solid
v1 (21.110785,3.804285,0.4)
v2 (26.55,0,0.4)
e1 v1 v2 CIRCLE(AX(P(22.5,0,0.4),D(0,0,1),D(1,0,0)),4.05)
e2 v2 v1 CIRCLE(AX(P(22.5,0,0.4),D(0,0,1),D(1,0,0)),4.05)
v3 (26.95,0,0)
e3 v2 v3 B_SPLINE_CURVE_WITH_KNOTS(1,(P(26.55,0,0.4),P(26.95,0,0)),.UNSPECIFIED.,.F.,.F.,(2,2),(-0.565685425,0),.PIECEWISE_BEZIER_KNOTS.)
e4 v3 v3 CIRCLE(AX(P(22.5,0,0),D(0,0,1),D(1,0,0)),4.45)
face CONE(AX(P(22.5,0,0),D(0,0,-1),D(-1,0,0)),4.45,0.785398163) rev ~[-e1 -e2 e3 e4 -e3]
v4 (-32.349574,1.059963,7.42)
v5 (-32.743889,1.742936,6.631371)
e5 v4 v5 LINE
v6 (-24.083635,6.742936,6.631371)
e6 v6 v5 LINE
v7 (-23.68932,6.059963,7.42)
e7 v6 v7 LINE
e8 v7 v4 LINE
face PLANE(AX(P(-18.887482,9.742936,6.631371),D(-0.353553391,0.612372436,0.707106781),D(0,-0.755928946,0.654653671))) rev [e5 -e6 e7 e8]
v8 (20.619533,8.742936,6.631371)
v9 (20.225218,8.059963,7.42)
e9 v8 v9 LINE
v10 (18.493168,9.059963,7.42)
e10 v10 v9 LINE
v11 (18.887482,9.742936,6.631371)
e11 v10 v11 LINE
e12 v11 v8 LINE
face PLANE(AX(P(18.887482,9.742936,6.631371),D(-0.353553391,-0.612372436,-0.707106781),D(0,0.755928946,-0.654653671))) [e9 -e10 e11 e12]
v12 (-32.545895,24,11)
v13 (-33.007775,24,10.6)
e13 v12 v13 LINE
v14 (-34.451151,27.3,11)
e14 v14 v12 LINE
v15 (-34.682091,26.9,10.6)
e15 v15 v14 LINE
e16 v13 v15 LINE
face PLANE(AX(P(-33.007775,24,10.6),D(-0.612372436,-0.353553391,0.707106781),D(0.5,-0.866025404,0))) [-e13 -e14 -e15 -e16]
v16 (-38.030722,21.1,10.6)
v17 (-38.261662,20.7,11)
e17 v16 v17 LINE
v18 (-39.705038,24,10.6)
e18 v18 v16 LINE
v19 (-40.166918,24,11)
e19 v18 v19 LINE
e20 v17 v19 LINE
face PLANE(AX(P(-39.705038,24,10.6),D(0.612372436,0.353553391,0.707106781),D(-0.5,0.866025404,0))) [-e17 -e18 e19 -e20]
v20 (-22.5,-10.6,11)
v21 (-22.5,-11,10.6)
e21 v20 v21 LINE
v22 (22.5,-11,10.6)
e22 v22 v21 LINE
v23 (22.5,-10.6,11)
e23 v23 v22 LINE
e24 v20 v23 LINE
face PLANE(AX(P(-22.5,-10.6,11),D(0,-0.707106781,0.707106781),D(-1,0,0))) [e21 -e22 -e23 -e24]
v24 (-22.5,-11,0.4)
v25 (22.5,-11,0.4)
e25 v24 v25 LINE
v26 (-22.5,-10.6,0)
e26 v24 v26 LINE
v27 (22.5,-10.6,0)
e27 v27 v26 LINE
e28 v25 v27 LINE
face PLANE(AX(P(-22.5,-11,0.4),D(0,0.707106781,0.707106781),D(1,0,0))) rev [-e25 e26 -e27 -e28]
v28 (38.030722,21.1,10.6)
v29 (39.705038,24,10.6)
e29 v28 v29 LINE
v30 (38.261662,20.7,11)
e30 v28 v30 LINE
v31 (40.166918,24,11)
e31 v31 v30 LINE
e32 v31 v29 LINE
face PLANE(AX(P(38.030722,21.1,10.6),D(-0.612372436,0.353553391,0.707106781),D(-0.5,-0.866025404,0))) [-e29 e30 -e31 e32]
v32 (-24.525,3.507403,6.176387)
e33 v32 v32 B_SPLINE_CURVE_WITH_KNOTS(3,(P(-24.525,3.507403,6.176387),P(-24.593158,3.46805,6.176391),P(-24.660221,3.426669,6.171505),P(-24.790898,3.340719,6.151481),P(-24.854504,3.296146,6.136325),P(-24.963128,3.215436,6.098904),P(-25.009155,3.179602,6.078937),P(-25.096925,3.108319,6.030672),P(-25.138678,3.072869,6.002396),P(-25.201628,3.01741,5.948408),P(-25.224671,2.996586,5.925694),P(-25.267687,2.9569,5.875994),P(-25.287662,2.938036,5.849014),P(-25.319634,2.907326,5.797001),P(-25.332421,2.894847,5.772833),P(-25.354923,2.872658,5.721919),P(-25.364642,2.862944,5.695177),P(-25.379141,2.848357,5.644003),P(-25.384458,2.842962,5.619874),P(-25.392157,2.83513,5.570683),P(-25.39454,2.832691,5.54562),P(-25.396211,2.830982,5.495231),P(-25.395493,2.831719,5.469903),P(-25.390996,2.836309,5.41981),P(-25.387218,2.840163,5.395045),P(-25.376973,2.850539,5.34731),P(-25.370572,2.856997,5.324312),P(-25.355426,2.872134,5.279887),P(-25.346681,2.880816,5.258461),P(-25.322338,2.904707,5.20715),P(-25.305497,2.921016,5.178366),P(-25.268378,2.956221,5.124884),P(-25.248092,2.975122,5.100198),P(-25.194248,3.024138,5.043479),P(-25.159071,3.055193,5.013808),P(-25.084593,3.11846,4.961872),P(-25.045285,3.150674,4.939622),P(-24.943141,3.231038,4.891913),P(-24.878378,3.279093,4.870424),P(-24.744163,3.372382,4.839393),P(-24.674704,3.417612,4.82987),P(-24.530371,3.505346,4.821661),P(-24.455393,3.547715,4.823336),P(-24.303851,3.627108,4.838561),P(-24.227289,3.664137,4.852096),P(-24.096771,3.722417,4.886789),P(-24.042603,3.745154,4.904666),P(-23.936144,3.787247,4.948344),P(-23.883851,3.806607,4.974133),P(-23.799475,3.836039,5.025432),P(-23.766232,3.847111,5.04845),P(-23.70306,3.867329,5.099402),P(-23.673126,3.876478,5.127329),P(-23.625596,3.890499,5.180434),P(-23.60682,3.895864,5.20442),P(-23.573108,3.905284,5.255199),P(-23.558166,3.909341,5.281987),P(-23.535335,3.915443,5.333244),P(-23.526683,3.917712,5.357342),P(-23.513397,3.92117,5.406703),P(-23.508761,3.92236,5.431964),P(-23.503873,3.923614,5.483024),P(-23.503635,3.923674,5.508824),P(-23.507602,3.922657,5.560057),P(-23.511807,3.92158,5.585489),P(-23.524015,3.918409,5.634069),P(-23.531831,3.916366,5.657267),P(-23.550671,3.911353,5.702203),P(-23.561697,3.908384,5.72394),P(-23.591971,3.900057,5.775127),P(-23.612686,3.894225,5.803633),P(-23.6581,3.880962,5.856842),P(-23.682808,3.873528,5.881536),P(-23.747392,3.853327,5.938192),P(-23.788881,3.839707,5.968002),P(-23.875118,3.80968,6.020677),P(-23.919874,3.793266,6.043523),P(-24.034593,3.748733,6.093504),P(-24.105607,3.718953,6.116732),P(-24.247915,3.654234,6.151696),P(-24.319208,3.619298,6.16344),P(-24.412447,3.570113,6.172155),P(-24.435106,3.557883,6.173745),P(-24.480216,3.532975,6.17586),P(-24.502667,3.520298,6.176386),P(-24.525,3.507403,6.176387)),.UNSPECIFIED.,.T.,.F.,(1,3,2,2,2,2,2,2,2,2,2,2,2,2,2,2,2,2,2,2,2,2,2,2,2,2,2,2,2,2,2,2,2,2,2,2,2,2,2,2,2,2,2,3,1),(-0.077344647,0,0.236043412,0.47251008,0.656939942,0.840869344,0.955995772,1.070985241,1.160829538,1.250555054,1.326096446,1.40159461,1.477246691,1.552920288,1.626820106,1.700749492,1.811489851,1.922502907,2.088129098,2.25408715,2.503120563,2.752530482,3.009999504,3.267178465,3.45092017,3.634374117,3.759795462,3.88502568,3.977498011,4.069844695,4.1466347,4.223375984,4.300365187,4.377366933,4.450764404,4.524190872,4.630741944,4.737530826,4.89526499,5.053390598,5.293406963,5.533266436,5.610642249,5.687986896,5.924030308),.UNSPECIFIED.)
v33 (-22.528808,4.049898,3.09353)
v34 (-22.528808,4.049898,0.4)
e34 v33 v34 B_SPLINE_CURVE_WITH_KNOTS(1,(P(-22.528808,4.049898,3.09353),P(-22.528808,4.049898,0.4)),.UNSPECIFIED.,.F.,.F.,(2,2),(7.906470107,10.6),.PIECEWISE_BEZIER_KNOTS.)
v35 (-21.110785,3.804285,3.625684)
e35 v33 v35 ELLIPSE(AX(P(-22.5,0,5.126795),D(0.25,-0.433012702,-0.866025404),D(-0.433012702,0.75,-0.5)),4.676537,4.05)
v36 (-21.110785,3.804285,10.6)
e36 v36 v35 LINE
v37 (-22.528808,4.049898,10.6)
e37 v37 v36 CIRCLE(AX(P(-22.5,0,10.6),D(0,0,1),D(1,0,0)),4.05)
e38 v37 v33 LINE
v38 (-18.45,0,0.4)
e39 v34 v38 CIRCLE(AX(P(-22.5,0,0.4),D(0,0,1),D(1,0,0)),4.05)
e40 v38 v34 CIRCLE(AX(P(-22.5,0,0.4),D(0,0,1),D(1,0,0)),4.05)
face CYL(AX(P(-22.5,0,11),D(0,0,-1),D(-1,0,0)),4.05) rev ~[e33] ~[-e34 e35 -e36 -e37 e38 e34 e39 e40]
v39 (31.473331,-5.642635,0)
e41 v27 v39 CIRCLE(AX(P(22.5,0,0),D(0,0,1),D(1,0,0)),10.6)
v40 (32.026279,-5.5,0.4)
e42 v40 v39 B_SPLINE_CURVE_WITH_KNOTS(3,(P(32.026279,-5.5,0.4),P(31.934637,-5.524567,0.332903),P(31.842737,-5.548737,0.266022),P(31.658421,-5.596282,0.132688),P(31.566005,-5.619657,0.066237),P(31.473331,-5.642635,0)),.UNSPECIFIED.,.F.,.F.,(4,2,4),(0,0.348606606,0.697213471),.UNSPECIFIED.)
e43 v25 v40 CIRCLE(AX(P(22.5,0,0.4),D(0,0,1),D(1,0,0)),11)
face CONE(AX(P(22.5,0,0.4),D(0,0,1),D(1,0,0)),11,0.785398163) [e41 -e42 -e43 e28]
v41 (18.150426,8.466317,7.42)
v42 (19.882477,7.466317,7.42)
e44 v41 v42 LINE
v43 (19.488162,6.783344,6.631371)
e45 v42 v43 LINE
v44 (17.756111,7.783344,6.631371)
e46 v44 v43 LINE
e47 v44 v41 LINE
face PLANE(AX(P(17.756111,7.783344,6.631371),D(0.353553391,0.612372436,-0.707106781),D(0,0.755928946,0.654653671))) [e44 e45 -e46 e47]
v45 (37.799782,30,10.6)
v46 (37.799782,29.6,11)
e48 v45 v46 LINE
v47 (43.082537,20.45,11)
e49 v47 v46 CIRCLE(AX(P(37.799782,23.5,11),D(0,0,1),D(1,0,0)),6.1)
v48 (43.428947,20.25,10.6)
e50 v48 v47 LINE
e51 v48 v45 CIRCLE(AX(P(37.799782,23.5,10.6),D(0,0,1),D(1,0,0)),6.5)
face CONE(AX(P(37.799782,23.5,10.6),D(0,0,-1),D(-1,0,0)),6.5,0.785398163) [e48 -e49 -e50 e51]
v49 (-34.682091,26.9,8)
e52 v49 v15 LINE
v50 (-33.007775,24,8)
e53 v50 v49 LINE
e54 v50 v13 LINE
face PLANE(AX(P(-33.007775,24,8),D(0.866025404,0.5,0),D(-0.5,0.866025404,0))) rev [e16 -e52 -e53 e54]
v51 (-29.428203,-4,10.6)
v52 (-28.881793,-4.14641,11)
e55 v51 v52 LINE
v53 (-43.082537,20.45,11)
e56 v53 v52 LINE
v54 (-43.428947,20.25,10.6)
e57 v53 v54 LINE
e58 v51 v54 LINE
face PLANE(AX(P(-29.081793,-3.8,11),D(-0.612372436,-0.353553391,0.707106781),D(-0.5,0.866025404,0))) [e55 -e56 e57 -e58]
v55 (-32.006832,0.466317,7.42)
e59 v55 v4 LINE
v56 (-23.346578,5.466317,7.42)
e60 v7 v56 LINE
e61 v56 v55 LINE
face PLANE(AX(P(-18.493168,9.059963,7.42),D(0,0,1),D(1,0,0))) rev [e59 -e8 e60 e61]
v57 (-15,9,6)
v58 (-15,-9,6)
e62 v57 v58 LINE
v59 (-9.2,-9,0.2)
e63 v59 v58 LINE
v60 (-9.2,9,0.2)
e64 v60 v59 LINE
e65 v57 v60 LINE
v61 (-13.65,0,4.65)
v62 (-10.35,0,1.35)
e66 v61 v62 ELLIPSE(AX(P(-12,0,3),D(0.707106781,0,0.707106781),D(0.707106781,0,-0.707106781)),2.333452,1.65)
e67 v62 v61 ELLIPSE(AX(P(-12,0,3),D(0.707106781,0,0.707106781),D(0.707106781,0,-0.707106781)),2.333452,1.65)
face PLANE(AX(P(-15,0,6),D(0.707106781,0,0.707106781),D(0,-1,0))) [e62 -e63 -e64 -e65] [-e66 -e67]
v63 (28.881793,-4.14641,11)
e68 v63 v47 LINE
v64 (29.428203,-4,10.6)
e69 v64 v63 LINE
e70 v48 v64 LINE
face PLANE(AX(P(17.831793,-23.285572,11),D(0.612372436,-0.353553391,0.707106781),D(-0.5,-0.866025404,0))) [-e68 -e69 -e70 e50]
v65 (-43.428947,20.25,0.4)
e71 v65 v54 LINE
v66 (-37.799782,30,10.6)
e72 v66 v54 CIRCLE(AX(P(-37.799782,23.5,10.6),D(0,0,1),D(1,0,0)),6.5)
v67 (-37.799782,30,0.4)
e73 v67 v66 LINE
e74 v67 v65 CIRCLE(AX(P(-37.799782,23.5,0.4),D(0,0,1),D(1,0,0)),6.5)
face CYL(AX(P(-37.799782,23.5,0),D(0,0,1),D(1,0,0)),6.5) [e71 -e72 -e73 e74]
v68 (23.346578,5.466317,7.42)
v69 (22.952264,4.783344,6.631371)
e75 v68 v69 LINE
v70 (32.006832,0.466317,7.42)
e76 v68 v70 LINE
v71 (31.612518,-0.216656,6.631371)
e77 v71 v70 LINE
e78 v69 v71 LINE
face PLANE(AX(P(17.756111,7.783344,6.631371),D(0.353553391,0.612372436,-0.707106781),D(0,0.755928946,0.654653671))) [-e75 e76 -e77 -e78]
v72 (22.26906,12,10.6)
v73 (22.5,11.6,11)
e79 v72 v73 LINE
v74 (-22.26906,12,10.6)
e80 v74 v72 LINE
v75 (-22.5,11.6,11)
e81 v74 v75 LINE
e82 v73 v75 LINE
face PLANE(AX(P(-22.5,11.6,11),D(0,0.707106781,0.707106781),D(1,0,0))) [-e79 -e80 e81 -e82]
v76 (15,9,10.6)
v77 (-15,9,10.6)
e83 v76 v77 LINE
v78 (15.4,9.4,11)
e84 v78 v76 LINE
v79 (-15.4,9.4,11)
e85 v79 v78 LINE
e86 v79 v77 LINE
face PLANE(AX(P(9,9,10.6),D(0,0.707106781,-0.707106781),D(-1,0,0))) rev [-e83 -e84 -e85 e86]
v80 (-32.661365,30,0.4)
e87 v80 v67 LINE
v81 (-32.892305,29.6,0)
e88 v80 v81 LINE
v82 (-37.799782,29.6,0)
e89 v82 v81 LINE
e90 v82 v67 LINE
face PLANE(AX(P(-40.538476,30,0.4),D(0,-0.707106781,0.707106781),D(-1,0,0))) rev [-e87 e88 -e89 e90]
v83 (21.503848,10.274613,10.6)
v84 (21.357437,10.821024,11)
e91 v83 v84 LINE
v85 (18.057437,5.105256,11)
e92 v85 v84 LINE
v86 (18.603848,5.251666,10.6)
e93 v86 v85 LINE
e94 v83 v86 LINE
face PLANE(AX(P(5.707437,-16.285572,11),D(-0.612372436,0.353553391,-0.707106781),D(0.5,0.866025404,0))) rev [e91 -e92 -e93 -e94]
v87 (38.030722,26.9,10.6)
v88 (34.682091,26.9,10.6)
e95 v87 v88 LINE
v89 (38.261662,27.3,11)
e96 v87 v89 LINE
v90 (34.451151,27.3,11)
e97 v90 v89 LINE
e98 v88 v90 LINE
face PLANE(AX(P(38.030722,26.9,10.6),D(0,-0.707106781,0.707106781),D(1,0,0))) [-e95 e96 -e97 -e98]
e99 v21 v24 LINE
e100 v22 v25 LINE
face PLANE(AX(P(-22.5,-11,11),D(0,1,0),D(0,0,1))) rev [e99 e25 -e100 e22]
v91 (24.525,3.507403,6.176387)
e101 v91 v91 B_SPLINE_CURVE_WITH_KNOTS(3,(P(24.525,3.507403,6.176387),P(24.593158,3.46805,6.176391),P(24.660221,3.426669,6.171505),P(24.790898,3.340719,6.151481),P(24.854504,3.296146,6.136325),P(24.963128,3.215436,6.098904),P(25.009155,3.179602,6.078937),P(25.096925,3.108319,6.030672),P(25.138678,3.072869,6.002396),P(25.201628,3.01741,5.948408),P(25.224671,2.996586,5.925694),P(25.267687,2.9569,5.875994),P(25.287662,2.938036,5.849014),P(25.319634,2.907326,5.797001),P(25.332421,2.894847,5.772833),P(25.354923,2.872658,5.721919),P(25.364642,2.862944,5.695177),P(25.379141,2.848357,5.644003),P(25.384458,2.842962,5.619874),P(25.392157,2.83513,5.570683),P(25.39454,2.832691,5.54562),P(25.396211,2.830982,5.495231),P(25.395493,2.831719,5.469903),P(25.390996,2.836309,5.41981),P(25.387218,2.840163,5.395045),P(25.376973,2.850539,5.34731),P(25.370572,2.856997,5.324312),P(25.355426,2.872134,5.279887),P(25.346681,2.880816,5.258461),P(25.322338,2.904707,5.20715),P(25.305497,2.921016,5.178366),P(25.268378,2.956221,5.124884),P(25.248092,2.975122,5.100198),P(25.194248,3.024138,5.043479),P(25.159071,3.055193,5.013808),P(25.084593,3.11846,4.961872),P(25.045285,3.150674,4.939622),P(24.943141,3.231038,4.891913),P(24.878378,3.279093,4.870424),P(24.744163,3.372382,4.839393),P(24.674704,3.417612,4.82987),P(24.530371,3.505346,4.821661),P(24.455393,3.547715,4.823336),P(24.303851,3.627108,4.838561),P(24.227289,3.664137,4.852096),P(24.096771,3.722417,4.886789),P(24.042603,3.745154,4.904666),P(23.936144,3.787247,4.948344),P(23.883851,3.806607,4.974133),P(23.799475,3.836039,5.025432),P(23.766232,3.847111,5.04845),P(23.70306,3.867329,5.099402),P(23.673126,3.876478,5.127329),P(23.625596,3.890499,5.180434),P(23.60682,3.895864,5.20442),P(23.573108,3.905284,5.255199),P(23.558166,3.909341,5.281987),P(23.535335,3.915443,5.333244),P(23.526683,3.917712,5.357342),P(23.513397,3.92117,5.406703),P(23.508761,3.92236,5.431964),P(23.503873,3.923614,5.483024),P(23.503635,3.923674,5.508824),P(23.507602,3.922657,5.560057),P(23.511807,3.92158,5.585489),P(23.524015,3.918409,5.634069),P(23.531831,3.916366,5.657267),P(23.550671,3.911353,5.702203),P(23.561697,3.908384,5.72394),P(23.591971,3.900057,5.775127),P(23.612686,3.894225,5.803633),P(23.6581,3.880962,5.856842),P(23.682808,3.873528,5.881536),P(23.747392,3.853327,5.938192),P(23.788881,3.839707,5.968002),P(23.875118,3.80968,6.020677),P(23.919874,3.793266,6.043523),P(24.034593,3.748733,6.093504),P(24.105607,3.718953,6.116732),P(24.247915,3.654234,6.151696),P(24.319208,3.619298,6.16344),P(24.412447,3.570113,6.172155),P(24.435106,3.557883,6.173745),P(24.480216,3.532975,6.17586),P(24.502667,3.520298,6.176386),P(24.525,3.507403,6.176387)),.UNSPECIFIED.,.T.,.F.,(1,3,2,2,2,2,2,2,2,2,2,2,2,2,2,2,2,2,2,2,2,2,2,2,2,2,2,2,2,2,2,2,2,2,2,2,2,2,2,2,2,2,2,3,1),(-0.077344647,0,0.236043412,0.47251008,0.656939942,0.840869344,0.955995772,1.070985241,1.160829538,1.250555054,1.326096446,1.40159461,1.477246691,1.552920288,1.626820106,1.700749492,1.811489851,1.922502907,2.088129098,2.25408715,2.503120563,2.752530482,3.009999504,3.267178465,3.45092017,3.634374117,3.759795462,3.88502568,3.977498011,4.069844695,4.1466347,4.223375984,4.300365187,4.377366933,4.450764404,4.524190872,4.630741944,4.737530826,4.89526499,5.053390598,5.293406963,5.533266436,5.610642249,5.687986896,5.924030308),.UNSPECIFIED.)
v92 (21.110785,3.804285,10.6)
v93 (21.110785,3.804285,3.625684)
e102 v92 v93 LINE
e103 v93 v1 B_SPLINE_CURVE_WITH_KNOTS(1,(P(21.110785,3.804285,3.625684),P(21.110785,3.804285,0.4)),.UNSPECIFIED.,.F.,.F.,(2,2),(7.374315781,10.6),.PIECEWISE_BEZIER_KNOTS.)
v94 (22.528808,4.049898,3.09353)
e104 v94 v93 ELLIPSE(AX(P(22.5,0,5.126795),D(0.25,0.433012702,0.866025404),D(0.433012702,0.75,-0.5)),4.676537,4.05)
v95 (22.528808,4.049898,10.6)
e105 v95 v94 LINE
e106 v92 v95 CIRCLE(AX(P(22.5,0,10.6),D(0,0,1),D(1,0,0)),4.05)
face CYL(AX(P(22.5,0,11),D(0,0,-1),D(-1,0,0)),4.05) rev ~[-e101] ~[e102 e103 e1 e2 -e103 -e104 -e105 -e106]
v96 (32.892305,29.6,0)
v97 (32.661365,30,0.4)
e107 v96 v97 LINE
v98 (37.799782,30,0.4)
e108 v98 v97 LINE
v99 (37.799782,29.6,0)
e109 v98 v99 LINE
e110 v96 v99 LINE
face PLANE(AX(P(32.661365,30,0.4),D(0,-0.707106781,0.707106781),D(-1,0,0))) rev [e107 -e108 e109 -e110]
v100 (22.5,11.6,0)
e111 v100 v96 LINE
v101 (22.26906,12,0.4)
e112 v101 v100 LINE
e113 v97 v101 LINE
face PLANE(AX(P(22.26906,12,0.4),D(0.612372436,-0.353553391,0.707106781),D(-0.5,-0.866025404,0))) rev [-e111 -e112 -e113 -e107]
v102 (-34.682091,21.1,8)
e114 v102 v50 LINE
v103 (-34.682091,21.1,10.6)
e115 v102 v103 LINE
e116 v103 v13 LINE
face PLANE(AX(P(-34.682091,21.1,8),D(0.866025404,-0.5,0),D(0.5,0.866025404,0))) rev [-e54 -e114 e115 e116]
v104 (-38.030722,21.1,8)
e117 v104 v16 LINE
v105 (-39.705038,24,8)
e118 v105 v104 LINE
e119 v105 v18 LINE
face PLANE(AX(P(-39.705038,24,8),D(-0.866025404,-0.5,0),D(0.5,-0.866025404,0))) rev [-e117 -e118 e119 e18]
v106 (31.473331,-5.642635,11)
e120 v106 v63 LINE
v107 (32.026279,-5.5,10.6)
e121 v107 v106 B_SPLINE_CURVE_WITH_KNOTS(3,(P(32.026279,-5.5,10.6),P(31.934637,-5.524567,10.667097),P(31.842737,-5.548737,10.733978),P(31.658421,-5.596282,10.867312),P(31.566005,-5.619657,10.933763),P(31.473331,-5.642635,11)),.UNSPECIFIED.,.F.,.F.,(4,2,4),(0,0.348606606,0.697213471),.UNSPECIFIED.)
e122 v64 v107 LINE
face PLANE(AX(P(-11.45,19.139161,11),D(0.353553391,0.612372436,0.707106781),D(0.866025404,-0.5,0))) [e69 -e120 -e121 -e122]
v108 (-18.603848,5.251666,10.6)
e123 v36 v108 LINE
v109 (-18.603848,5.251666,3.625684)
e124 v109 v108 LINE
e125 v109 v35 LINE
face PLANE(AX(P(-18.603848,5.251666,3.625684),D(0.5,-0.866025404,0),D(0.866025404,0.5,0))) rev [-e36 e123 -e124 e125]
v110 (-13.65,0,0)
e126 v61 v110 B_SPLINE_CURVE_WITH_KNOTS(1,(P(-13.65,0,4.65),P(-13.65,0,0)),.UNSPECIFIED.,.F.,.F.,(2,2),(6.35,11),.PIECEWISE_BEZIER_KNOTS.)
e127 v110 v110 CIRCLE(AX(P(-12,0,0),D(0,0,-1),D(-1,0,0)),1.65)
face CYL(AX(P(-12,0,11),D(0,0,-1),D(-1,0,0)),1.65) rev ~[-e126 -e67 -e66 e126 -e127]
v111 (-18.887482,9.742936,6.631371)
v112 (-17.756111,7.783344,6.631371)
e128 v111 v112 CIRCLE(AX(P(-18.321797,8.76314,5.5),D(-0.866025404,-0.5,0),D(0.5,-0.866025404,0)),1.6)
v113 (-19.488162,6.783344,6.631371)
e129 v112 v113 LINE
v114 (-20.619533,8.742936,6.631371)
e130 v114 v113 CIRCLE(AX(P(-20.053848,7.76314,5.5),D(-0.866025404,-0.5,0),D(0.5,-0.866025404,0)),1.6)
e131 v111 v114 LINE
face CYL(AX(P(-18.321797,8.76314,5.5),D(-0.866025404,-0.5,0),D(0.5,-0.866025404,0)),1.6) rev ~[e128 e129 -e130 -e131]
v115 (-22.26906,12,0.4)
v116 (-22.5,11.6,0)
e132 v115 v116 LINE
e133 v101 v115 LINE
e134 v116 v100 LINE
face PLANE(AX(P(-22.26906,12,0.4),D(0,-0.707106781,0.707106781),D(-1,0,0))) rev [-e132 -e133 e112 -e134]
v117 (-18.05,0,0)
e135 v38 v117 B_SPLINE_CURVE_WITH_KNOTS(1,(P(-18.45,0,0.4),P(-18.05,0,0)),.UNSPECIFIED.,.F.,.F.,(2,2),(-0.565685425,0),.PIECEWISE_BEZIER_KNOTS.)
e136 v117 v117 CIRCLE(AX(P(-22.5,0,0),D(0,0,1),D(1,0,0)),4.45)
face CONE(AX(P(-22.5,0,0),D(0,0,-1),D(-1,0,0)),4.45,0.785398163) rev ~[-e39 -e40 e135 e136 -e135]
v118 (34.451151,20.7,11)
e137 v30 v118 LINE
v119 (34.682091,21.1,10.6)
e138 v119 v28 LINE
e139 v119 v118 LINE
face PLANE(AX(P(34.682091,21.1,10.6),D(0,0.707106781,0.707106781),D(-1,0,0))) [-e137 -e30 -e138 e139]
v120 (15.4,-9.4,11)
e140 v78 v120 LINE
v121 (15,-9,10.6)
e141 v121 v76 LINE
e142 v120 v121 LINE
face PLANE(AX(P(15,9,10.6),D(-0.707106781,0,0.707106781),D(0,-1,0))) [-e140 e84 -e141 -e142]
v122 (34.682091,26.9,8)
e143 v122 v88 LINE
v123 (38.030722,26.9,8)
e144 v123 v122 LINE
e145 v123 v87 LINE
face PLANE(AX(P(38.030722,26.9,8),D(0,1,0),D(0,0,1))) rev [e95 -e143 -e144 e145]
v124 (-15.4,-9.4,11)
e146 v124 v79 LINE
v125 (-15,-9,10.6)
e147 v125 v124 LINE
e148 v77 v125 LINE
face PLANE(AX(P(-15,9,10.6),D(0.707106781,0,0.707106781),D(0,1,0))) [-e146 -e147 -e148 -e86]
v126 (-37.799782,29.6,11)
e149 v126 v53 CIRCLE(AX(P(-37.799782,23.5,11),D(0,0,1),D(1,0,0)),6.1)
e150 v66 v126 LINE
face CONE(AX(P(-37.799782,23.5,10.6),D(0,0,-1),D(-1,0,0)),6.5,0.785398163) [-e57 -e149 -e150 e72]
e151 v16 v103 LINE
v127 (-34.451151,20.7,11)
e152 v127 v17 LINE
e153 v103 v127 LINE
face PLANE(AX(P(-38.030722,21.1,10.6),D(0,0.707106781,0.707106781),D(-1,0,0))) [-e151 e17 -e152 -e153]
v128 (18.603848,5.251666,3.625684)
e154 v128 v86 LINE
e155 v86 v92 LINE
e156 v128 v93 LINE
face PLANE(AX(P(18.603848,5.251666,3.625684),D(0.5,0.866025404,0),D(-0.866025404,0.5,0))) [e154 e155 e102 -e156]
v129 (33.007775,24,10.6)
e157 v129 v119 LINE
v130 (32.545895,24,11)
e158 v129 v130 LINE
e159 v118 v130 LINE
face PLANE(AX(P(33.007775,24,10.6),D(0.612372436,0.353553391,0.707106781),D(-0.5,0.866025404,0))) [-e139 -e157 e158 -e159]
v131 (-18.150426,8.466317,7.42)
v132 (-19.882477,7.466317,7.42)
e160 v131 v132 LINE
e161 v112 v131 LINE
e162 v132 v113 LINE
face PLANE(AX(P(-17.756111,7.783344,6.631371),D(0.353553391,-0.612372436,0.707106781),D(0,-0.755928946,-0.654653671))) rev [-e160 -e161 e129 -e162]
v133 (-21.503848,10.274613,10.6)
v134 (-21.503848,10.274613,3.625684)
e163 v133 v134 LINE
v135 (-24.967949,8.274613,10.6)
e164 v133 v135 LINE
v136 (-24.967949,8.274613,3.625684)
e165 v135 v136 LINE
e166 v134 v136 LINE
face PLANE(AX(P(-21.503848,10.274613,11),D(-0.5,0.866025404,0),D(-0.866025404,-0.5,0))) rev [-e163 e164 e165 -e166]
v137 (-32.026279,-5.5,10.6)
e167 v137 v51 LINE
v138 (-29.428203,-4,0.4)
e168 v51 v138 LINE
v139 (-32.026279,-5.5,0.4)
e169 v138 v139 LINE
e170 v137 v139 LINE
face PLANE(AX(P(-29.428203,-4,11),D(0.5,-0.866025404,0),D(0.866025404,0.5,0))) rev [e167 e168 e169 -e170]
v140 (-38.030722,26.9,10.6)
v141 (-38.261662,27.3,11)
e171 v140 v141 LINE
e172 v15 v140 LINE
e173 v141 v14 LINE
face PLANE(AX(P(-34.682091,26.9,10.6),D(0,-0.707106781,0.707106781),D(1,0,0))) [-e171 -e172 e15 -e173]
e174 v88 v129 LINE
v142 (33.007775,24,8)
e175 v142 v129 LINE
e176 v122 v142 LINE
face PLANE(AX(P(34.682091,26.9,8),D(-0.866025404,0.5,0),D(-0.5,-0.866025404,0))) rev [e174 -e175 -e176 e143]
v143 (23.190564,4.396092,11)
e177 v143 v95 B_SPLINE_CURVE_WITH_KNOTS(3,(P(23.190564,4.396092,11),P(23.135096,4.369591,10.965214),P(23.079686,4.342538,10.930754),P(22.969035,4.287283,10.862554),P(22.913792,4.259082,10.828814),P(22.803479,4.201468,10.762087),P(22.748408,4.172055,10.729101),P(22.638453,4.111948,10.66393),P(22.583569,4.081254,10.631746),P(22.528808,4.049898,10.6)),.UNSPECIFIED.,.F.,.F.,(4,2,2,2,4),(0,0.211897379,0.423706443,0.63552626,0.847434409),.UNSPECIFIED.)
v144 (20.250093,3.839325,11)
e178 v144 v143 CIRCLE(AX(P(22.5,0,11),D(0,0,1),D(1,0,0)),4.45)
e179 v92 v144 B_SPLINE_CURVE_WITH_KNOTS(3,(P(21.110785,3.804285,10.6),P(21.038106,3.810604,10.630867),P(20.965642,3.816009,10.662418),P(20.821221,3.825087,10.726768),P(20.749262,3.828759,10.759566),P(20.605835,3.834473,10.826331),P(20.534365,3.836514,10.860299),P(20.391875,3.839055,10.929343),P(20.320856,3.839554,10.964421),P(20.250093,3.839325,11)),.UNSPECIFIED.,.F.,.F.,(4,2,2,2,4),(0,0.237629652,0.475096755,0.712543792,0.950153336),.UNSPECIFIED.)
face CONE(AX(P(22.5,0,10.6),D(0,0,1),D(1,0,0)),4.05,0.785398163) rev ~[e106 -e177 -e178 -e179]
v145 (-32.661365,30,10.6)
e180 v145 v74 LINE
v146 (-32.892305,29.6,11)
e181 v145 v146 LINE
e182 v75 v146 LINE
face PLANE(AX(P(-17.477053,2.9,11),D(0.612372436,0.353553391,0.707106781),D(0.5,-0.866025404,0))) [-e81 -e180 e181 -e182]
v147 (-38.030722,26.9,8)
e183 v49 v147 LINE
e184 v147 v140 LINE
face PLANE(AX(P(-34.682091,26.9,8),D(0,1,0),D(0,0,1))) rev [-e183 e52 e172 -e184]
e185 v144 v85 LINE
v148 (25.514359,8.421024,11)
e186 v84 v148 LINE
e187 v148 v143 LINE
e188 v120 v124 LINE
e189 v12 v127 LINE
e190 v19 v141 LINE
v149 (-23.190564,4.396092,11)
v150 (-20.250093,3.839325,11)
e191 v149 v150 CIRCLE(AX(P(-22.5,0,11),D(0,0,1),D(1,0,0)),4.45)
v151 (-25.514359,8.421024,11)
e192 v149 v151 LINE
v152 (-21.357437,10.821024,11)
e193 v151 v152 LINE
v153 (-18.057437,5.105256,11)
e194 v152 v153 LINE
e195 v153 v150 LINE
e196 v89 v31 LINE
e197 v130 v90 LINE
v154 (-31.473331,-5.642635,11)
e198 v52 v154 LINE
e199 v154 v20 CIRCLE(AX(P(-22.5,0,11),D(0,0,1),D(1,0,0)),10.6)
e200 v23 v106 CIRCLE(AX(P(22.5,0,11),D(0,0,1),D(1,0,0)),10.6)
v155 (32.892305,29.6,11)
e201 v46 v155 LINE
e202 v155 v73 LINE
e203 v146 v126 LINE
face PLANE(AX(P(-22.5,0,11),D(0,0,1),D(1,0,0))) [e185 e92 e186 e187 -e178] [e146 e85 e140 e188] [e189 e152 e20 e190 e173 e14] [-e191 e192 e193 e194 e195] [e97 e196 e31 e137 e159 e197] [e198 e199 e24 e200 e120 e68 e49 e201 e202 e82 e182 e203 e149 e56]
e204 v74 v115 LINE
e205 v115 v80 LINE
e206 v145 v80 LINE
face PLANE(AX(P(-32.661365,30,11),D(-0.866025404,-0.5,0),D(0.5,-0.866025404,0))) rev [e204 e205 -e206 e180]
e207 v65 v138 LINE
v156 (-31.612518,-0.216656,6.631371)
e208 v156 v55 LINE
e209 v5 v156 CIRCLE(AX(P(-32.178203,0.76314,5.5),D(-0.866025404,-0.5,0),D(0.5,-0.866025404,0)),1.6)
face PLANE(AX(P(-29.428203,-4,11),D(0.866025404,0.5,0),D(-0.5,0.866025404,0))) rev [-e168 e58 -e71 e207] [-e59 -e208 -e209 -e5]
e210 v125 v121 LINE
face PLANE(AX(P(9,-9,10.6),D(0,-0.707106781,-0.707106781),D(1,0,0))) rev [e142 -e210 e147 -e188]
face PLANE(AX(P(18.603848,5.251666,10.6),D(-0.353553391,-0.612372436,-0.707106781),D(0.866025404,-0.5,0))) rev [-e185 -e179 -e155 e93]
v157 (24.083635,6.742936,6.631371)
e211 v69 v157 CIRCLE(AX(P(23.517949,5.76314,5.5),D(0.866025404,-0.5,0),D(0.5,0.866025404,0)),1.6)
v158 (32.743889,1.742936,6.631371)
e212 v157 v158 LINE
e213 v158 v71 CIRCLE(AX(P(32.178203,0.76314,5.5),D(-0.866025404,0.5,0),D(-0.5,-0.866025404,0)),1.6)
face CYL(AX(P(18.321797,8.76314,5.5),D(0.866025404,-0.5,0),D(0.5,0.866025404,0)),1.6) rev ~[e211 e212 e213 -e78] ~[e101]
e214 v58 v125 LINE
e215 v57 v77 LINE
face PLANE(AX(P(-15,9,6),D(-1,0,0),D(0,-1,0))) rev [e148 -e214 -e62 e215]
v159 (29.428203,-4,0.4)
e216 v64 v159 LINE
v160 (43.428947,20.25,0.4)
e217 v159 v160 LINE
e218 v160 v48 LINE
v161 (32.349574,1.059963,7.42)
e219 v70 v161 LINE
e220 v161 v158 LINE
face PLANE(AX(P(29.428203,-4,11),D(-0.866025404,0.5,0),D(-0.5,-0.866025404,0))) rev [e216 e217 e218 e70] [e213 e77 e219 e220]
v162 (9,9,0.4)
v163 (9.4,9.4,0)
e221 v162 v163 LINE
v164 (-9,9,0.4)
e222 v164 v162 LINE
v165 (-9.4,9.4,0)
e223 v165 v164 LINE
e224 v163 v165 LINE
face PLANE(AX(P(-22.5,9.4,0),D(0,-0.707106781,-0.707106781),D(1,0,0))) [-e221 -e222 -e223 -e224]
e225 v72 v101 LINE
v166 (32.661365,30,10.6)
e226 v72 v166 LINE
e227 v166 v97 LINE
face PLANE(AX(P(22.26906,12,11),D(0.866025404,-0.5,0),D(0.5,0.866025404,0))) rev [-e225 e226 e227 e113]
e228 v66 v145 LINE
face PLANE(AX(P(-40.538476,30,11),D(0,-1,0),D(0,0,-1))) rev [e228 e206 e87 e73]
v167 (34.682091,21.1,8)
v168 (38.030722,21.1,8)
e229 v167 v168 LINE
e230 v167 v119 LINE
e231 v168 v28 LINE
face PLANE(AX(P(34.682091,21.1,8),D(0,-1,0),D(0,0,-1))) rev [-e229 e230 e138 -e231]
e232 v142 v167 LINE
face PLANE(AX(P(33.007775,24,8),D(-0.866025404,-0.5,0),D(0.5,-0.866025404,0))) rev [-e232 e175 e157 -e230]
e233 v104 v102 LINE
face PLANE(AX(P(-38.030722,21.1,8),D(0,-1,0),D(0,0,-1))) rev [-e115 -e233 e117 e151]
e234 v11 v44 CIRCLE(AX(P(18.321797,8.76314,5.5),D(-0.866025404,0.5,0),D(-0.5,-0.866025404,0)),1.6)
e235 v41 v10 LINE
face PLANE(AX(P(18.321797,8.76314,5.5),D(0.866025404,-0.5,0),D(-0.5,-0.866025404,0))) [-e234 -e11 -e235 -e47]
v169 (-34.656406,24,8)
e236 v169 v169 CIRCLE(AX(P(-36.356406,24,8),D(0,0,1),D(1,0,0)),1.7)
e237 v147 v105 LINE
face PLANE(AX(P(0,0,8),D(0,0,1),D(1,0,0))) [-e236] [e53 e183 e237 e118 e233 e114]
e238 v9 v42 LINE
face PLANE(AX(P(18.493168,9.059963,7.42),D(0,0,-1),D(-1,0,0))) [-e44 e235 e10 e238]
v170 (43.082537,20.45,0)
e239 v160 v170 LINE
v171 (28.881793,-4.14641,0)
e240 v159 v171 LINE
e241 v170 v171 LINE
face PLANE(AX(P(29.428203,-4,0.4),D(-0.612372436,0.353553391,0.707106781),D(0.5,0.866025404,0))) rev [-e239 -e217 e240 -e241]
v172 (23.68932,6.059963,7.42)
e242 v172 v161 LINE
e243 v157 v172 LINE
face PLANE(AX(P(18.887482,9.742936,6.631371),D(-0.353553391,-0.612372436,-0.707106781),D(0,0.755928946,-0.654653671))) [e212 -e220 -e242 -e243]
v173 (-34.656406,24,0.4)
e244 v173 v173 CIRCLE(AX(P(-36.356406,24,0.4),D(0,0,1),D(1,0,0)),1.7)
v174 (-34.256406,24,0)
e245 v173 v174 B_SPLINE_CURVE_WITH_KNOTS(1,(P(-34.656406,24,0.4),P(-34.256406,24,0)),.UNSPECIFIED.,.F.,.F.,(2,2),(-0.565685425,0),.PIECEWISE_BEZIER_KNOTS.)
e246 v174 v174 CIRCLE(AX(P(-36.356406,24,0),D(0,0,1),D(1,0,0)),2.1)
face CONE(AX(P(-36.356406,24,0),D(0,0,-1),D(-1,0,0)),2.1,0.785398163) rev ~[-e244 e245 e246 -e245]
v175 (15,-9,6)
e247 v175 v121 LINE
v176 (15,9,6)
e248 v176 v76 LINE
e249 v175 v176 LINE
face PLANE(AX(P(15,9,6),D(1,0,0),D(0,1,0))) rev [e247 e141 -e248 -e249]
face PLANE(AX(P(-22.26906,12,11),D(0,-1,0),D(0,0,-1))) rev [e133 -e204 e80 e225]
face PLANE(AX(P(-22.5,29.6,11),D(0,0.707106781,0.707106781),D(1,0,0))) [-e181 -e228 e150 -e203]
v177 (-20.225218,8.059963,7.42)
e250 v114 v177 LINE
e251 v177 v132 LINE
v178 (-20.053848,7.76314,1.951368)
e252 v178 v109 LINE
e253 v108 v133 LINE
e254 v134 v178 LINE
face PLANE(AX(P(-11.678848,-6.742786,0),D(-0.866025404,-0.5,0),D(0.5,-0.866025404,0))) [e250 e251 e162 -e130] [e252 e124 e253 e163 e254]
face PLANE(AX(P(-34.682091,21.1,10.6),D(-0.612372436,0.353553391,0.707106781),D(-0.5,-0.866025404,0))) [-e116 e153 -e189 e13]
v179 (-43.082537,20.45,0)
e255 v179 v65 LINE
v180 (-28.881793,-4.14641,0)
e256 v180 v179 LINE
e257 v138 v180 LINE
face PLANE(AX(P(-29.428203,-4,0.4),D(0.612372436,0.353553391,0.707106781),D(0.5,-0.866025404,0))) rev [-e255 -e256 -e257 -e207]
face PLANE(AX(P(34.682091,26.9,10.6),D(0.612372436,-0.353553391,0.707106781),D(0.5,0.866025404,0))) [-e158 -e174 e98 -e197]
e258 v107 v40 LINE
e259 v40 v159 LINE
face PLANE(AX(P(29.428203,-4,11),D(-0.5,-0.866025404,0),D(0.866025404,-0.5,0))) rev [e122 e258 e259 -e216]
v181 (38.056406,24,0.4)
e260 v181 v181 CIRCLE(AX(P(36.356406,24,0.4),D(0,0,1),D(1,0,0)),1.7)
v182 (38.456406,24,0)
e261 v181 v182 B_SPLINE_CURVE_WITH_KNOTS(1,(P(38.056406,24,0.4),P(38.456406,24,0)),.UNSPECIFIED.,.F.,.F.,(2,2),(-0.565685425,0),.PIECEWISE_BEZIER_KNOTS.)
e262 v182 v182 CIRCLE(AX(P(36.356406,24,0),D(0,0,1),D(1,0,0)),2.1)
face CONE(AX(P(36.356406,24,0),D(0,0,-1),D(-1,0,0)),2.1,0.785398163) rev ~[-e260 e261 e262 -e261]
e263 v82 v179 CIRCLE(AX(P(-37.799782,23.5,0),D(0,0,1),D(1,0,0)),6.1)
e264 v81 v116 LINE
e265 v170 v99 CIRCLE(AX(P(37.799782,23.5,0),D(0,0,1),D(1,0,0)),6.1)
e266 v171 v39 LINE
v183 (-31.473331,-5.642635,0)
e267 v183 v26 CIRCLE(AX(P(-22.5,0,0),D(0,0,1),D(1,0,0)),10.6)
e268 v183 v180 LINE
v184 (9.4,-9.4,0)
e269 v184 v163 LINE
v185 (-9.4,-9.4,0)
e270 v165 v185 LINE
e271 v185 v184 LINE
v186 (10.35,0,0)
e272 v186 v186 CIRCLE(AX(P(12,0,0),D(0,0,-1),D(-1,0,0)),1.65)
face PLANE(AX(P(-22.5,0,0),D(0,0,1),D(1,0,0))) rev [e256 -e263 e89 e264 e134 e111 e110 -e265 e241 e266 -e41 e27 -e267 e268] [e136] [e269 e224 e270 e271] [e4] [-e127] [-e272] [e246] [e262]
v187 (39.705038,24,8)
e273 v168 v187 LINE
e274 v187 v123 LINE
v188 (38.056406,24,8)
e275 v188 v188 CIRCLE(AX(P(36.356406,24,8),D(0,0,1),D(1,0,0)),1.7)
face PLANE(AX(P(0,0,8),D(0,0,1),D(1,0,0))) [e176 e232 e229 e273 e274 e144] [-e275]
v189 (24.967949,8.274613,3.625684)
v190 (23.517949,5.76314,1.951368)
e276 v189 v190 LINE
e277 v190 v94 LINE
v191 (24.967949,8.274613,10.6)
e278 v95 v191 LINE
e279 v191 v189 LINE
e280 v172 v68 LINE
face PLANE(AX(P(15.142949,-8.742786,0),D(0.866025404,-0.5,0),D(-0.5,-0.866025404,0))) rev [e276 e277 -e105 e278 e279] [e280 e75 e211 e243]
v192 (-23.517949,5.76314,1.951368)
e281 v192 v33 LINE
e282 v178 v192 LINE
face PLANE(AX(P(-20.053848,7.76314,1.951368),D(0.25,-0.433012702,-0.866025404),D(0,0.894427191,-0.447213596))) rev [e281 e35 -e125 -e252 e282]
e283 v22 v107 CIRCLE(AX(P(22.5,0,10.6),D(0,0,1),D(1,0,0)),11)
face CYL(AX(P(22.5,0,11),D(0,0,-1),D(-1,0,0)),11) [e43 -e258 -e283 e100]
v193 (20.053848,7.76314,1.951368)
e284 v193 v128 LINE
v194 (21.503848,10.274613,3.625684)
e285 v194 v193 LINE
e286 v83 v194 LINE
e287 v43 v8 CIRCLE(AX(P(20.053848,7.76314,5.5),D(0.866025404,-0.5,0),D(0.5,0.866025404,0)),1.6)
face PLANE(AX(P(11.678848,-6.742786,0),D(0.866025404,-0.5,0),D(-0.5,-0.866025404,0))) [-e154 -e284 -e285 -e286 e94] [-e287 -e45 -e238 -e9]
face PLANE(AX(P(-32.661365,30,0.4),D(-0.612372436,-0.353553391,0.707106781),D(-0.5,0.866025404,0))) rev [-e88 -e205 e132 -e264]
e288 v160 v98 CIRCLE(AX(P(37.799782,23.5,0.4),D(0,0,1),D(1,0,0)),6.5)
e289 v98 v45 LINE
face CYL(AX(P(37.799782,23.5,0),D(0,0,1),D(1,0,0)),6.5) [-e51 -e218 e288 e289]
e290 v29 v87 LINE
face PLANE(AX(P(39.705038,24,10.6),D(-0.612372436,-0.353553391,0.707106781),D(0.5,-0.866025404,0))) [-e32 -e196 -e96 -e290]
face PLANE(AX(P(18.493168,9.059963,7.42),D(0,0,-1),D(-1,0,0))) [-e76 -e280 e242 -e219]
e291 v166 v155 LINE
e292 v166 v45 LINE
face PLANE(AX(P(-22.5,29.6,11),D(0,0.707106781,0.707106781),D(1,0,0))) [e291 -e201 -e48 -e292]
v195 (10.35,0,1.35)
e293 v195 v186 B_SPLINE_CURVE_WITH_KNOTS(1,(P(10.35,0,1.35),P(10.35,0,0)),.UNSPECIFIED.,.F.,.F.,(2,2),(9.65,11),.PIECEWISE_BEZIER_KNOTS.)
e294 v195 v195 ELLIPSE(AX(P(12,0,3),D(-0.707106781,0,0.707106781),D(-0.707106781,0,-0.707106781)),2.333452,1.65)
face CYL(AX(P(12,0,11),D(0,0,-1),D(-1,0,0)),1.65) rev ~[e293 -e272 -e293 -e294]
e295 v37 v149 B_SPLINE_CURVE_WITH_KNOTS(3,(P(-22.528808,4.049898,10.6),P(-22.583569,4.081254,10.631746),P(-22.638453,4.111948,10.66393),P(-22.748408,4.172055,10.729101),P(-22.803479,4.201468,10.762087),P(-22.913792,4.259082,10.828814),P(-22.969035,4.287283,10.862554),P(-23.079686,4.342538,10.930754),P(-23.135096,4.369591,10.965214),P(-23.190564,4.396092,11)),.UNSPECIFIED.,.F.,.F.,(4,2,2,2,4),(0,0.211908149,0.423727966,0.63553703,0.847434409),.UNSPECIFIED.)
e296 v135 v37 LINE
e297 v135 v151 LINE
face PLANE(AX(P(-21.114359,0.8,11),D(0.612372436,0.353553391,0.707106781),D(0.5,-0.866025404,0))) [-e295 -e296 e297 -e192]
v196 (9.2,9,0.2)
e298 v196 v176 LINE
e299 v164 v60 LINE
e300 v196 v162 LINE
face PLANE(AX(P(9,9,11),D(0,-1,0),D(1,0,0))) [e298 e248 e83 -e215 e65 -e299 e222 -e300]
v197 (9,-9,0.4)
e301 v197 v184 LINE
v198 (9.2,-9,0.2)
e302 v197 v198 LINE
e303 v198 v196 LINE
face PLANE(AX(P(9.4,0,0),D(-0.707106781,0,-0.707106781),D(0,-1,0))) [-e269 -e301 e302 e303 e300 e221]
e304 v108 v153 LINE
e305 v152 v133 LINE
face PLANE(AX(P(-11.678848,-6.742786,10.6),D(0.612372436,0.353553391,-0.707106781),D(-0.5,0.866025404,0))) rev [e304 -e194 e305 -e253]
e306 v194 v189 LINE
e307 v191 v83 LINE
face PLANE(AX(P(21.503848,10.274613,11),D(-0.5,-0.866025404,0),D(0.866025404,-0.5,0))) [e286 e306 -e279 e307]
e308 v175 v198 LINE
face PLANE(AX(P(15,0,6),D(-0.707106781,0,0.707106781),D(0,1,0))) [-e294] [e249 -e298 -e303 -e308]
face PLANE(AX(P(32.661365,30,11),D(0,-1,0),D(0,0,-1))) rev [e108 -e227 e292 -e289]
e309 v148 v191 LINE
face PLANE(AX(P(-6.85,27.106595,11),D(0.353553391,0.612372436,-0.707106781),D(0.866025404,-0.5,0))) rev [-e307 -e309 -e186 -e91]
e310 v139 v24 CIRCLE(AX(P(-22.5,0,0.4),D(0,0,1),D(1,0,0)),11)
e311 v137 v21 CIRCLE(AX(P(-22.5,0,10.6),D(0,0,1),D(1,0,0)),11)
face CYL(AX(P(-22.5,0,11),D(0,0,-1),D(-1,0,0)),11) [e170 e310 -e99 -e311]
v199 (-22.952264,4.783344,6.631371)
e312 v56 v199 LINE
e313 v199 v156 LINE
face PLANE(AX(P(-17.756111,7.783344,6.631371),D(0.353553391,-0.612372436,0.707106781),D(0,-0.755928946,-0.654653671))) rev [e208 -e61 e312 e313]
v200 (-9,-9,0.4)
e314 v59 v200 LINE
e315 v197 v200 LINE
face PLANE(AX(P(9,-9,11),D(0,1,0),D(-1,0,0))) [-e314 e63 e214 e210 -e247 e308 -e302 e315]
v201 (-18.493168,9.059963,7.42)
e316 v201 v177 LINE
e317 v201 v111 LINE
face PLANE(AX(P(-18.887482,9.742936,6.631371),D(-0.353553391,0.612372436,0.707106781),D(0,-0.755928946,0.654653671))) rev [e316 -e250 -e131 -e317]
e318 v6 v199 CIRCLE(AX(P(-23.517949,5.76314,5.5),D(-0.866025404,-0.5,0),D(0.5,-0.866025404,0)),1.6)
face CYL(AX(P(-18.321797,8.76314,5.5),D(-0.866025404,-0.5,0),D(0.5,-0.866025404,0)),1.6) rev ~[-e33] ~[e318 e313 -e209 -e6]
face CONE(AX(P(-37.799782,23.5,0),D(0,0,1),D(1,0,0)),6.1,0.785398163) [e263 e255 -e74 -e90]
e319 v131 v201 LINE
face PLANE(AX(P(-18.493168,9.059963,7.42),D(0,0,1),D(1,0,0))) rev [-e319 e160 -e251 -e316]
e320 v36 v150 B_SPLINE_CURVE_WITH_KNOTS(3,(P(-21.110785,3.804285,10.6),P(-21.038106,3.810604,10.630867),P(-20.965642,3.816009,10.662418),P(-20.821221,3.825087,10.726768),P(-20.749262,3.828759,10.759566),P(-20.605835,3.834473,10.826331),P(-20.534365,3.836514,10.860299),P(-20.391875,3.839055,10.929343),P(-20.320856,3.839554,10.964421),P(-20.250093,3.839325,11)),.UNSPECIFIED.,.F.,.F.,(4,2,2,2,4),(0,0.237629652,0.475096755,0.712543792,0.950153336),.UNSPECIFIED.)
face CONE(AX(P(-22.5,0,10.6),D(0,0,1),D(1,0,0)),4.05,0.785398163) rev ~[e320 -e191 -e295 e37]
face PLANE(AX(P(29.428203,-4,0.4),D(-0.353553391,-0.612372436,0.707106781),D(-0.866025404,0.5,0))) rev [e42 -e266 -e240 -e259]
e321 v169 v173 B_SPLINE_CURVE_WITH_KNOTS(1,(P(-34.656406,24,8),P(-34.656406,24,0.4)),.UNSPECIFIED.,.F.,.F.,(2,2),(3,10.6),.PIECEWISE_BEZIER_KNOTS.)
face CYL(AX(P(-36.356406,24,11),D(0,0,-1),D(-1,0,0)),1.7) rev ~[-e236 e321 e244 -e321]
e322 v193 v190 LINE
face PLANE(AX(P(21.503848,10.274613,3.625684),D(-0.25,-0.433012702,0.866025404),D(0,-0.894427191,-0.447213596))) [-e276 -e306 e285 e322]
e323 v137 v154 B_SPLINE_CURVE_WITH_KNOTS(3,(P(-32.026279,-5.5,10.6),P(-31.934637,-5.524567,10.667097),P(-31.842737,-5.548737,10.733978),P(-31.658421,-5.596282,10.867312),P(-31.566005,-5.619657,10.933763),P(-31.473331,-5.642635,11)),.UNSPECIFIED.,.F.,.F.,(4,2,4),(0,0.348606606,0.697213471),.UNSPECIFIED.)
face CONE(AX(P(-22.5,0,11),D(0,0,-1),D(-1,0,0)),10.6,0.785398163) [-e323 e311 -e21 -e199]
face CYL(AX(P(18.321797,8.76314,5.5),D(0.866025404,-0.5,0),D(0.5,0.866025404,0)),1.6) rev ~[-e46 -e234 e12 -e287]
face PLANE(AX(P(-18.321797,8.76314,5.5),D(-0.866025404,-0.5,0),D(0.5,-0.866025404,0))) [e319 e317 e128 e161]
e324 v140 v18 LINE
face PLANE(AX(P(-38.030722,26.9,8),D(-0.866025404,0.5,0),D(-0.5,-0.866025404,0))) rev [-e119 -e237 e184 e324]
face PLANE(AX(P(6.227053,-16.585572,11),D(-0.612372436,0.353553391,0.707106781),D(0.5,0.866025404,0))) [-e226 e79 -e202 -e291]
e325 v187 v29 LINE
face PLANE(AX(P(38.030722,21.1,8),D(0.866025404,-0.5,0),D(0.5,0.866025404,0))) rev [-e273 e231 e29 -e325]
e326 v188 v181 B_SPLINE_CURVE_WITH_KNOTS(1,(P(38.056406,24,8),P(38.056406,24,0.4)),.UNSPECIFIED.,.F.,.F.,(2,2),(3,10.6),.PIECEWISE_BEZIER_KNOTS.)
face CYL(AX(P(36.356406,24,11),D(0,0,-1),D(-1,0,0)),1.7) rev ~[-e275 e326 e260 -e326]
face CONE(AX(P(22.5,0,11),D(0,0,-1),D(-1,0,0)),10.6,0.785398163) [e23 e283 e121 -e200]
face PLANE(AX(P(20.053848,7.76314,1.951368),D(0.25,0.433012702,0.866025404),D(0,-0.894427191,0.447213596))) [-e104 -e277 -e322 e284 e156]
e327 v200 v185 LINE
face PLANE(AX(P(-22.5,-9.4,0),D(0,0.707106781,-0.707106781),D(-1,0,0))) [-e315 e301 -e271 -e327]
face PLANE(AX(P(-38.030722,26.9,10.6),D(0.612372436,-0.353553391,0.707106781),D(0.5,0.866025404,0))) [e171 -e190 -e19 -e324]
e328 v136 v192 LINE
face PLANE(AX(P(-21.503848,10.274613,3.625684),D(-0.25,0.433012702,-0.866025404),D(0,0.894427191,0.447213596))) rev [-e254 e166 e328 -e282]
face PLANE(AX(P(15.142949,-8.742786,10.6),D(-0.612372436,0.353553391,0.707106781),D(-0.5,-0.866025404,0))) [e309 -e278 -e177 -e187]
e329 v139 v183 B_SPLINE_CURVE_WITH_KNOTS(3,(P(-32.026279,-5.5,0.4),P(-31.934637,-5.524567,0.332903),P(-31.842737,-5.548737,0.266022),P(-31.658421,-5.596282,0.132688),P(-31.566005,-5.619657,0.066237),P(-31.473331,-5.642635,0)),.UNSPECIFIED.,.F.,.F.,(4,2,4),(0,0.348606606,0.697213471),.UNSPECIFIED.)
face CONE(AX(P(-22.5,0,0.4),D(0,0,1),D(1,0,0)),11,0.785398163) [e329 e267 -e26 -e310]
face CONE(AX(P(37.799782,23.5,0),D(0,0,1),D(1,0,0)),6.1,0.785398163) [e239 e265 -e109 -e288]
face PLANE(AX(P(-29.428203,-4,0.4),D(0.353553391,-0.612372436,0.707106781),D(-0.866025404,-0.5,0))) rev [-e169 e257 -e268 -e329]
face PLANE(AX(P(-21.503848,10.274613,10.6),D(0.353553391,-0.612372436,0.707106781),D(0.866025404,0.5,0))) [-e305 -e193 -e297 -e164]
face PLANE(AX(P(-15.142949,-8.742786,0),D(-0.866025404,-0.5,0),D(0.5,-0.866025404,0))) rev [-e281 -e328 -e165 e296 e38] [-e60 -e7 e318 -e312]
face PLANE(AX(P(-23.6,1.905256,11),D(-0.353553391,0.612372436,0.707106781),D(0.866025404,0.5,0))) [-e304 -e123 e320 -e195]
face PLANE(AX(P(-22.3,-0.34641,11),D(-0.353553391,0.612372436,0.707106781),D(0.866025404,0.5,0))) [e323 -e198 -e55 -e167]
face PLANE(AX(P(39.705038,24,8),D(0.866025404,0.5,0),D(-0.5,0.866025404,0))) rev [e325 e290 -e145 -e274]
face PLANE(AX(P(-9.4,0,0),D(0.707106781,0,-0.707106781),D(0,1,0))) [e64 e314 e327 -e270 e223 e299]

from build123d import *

# Parameters (mm, degrees)
SKETCH1_R           = 4.05
SKETCH1_R_2         = 1.7
SKETCH1_W           = 18
SKETCH1_H           = 18
BOSS_EXTRUDE1_DEPTH = 11
SKETCH11_W          = 30
SKETCH11_H          = 18
CUT_EXTRUDE9_DEPTH  = 5
CUT_EXTRUDE4_DEPTH  = 16
CUT_EXTRUDE5_START  = -10
CUT_EXTRUDE5_DEPTH  = 4
CUT_EXTRUDE7_DEPTH  = 57.773728613
CUT_EXTRUDE8_DEPTH  = 3
CHAMFER1_SIZE       = 0.4
CHAMFER2_SIZE       = 0.4
CHAMFER3_SIZE       = 6
SKETCH12_R          = 1.65
CUT_EXTRUDE10_DEPTH = 55.621156131


with BuildPart() as part:
    # Sketch1 → Boss-Extrude1 (new body)
    with BuildSketch(Plane.XY):
        with BuildLine():
            Line((-29.42820323, -4), (-46.92820323, 26.310889132))
            Line((-46.92820323, 26.310889132), (-40.538475773, 30))
            Line((-40.538475773, 30), (-32.661364738, 30))
            Line((-32.661364738, 30), (-22.269059892, 12))
            Line((-22.269059892, 12), (22.269059892, 12))
            Line((22.269059892, 12), (32.661364738, 30))
            Line((32.661364738, 30), (40.538475773, 30))
            Line((40.538475773, 30), (46.92820323, 26.310889132))
            Line((46.92820323, 26.310889132), (29.42820323, -4))
            Line((29.42820323, -4), (32.026279442, -5.5))
            ThreePointArc((32.026279442, -5.5), (28, -9.526279442), (22.5, -11))
            Line((22.5, -11), (-22.5, -11))
            ThreePointArc((-22.5, -11), (-28, -9.526279442), (-32.026279442, -5.5))
            Line((-32.026279442, -5.5), (-29.42820323, -4))
        make_face()
        with Locations((-22.5, 0)):
            Circle(SKETCH1_R, mode=Mode.SUBTRACT)
        with Locations(Location((22.5, 0, 0), (0, 0, 180))):
            Circle(SKETCH1_R, mode=Mode.SUBTRACT)
        with Locations((-36.356406461, 24)):
            Circle(SKETCH1_R_2, mode=Mode.SUBTRACT)
        with Locations((36.356406461, 24)):
            Circle(SKETCH1_R_2, mode=Mode.SUBTRACT)
        Rectangle(SKETCH1_W, SKETCH1_H, mode=Mode.SUBTRACT)
    extrude(amount=BOSS_EXTRUDE1_DEPTH)

    # Sketch11 → Cut-Extrude9 (cut)
    with BuildSketch(Plane.XY.offset(11)):
        Rectangle(SKETCH11_W, SKETCH11_H)
    extrude(amount=-CUT_EXTRUDE9_DEPTH, mode=Mode.SUBTRACT)

    # Sketch6 → Cut-Extrude4 (cut)
    with BuildSketch(Plane(origin=(-23.80320323, -13.742785793, 0), x_dir=(0, 0, 1), z_dir=(-0.8660254037844398, -0.4999999999999983, 0))):
        with BuildLine():
            Line((6.63137085, 15.61862915), (7.42, 16.4072583))
            Line((7.42, 16.4072583), (7.42, 17.0927417))
            Line((7.42, 17.0927417), (6.63137085, 17.88137085))
            ThreePointArc((6.63137085, 17.88137085), (3.9, 16.75), (6.63137085, 15.61862915))
        make_face()
    cut_extrude4 = extrude(amount=-CUT_EXTRUDE4_DEPTH, mode=Mode.SUBTRACT)

    # Sketch7 → Cut-Extrude5 (cut)
    with BuildSketch(Plane(origin=(-23.80320323, -13.742785793, 0), x_dir=(0, 0, 1), z_dir=(-0.8660254037844398, -0.4999999999999983, 0)).offset(CUT_EXTRUDE5_START)):
        Polygon((11, 19.65), (11, 13.85), (3.625684219, 13.85), (1.951368439, 16.75), (3.625684219, 19.65), align=None)
    cut_extrude5 = extrude(amount=-CUT_EXTRUDE5_DEPTH, mode=Mode.SUBTRACT)

    # Mirror2: Cut-Extrude4, Cut-Extrude5 across plane
    add(cut_extrude4.mirror(Plane(origin=(0, 0, 0), x_dir=(0, 0, 1), z_dir=(1, 0, 0))), mode=Mode.SUBTRACT)
    add(cut_extrude5.mirror(Plane(origin=(0, 0, 0), x_dir=(0, 0, 1), z_dir=(1, 0, 0))), mode=Mode.SUBTRACT)

    # Sketch9 → Cut-Extrude7 (cut, through all)
    with BuildSketch(Plane.XY.offset(11)):
        with BuildLine():
            Line((-43.428947258, 20.25), (-46.92820323, 26.310889132))
            Line((-46.92820323, 26.310889132), (-40.538475773, 30))
            Line((-40.538475773, 30), (-37.799782134, 30))
            ThreePointArc((-37.799782134, 30), (-43.428947258, 26.75), (-43.428947258, 20.25))
        make_face()
        with BuildLine():
            Line((40.538475773, 30), (37.799782134, 30))
            ThreePointArc((37.799782134, 30), (43.428947258, 26.75), (43.428947258, 20.25))
            Line((43.428947258, 20.25), (46.92820323, 26.310889132))
            Line((46.92820323, 26.310889132), (40.538475773, 30))
        make_face()
    extrude(amount=-CUT_EXTRUDE7_DEPTH, mode=Mode.SUBTRACT)

    # Sketch10 → Cut-Extrude8 (cut)
    with BuildSketch(Plane.XY.offset(11)):
        Polygon((39.705038022, 24), (38.030722241, 26.9), (34.68209068, 26.9), (33.007774899, 24), (34.68209068, 21.1), (38.030722241, 21.1), align=None)
        Polygon((-33.007774899, 24), (-34.68209068, 26.9), (-38.030722241, 26.9), (-39.705038022, 24), (-38.030722241, 21.1), (-34.68209068, 21.1), align=None)
    extrude(amount=-CUT_EXTRUDE8_DEPTH, mode=Mode.SUBTRACT)

    # Chamfer1
    chamfer1_edges = [part.edges().sort_by_distance(p)[0] for p in [
        (0, -11, 11),
        (-25.353578994, -2.873949708, 11),
        (-23.748378775, 6.162255466, 11),
        (-20.053847577, 7.763139721, 11),
        (-23.235898385, 9.274613392, 11),
        (-19.857316504, 4.527975428, 11),
        (28, -9.526279442, 11),
        (30.727241336, -4.75, 11),
        (25.353578994, -2.873949708, 11),
        (23.235898385, 9.274613392, 11),
        (19.857316504, 4.527975428, 11),
        (23.748378775, 6.162255466, 11),
        (20.053847577, 7.763139721, 11),
        (36.428575244, 8.125, 11),
        (-36.428575244, 8.125, 11),
        (-43.428947258, 26.75, 11),
        (35.230573436, 30, 11),
        (43.428947258, 26.75, 11),
        (38.867880132, 22.55, 11),
        (38.867880132, 25.45, 11),
        (36.356406461, 26.9, 11),
        (33.84493279, 25.45, 11),
        (33.84493279, 22.55, 11),
        (36.356406461, 21.1, 11),
        (-33.84493279, 22.55, 11),
        (-33.84493279, 25.45, 11),
        (-36.356406461, 26.9, 11),
        (-38.867880132, 25.45, 11),
        (-38.867880132, 22.55, 11),
        (-36.356406461, 21.1, 11),
        (27.465212315, 21, 11),
        (0, 12, 11),
        (-27.465212315, 21, 11),
        (-35.230573436, 30, 11),
        (-30.727241336, -4.75, 11),
        (0, -9, 11),
        (0, 9, 11),
        (-28, -9.526279442, 11),
        (-15, 0, 11),
        (15, 0, 11),
    ]]
    chamfer(chamfer1_edges, length=CHAMFER1_SIZE)

    # Chamfer2
    chamfer2_edges = [part.edges().sort_by_distance(p)[0] for p in [
        (-35.230573436, 30, 0),
        (-27.465212315, 21, 0),
        (0, 12, 0),
        (27.465212315, 21, 0),
        (36.428575244, 8.125, 0),
        (30.727241336, -4.75, 0),
        (28, -9.526279442, 0),
        (0, -11, 0),
        (-28, -9.526279442, 0),
        (-30.727241336, -4.75, 0),
        (-36.428575244, 8.125, 0),
        (-43.428947258, 26.75, 0),
        (35.230573436, 30, 0),
        (43.428947258, 26.75, 0),
        (-26.55, 0, 0),
        (26.55, 0, 0),
        (-9, 0, 0),
        (0, -9, 0),
        (9, 0, 0),
        (0, 9, 0),
        (-38.056406461, 24, 0),
        (34.656406461, 24, 0),
    ]]
    chamfer(chamfer2_edges, length=CHAMFER2_SIZE)

    # Chamfer3
    # the kernel refuses this chamfer: 6 mm, written as the material it takes off along each edge
    with BuildSketch(Plane(origin=(-9, -9, 6), x_dir=(0.02749587661058649, 0, -0.9996219169112968), z_dir=(0, 1, 0)), Plane(origin=(9, 9, 6), x_dir=(-0.02749587661058649, 0, -0.9996219169112968), z_dir=(0, -1, 0))) as chamfer3_piece_1:
        Polygon((CHAMFER3_SIZE * 0.999621916911, CHAMFER3_SIZE * 0.0274958766106), (-CHAMFER3_SIZE * 0.0274958766106, CHAMFER3_SIZE * 0.999621916911), (0, 0), align=None)
    extrude(amount=18, mode=Mode.SUBTRACT)

    # Sketch12 → Cut-Extrude10 (cut, through all)
    with BuildSketch(Plane(origin=(0, 0, 0), x_dir=(-1, 0, 0), z_dir=(0, 0, -1))):
        with Locations((12, 0)):
            Circle(SKETCH12_R)
        with Locations((-12, 0)):
            Circle(SKETCH12_R)
    extrude(amount=-CUT_EXTRUDE10_DEPTH, mode=Mode.SUBTRACT)


solid = part.part
